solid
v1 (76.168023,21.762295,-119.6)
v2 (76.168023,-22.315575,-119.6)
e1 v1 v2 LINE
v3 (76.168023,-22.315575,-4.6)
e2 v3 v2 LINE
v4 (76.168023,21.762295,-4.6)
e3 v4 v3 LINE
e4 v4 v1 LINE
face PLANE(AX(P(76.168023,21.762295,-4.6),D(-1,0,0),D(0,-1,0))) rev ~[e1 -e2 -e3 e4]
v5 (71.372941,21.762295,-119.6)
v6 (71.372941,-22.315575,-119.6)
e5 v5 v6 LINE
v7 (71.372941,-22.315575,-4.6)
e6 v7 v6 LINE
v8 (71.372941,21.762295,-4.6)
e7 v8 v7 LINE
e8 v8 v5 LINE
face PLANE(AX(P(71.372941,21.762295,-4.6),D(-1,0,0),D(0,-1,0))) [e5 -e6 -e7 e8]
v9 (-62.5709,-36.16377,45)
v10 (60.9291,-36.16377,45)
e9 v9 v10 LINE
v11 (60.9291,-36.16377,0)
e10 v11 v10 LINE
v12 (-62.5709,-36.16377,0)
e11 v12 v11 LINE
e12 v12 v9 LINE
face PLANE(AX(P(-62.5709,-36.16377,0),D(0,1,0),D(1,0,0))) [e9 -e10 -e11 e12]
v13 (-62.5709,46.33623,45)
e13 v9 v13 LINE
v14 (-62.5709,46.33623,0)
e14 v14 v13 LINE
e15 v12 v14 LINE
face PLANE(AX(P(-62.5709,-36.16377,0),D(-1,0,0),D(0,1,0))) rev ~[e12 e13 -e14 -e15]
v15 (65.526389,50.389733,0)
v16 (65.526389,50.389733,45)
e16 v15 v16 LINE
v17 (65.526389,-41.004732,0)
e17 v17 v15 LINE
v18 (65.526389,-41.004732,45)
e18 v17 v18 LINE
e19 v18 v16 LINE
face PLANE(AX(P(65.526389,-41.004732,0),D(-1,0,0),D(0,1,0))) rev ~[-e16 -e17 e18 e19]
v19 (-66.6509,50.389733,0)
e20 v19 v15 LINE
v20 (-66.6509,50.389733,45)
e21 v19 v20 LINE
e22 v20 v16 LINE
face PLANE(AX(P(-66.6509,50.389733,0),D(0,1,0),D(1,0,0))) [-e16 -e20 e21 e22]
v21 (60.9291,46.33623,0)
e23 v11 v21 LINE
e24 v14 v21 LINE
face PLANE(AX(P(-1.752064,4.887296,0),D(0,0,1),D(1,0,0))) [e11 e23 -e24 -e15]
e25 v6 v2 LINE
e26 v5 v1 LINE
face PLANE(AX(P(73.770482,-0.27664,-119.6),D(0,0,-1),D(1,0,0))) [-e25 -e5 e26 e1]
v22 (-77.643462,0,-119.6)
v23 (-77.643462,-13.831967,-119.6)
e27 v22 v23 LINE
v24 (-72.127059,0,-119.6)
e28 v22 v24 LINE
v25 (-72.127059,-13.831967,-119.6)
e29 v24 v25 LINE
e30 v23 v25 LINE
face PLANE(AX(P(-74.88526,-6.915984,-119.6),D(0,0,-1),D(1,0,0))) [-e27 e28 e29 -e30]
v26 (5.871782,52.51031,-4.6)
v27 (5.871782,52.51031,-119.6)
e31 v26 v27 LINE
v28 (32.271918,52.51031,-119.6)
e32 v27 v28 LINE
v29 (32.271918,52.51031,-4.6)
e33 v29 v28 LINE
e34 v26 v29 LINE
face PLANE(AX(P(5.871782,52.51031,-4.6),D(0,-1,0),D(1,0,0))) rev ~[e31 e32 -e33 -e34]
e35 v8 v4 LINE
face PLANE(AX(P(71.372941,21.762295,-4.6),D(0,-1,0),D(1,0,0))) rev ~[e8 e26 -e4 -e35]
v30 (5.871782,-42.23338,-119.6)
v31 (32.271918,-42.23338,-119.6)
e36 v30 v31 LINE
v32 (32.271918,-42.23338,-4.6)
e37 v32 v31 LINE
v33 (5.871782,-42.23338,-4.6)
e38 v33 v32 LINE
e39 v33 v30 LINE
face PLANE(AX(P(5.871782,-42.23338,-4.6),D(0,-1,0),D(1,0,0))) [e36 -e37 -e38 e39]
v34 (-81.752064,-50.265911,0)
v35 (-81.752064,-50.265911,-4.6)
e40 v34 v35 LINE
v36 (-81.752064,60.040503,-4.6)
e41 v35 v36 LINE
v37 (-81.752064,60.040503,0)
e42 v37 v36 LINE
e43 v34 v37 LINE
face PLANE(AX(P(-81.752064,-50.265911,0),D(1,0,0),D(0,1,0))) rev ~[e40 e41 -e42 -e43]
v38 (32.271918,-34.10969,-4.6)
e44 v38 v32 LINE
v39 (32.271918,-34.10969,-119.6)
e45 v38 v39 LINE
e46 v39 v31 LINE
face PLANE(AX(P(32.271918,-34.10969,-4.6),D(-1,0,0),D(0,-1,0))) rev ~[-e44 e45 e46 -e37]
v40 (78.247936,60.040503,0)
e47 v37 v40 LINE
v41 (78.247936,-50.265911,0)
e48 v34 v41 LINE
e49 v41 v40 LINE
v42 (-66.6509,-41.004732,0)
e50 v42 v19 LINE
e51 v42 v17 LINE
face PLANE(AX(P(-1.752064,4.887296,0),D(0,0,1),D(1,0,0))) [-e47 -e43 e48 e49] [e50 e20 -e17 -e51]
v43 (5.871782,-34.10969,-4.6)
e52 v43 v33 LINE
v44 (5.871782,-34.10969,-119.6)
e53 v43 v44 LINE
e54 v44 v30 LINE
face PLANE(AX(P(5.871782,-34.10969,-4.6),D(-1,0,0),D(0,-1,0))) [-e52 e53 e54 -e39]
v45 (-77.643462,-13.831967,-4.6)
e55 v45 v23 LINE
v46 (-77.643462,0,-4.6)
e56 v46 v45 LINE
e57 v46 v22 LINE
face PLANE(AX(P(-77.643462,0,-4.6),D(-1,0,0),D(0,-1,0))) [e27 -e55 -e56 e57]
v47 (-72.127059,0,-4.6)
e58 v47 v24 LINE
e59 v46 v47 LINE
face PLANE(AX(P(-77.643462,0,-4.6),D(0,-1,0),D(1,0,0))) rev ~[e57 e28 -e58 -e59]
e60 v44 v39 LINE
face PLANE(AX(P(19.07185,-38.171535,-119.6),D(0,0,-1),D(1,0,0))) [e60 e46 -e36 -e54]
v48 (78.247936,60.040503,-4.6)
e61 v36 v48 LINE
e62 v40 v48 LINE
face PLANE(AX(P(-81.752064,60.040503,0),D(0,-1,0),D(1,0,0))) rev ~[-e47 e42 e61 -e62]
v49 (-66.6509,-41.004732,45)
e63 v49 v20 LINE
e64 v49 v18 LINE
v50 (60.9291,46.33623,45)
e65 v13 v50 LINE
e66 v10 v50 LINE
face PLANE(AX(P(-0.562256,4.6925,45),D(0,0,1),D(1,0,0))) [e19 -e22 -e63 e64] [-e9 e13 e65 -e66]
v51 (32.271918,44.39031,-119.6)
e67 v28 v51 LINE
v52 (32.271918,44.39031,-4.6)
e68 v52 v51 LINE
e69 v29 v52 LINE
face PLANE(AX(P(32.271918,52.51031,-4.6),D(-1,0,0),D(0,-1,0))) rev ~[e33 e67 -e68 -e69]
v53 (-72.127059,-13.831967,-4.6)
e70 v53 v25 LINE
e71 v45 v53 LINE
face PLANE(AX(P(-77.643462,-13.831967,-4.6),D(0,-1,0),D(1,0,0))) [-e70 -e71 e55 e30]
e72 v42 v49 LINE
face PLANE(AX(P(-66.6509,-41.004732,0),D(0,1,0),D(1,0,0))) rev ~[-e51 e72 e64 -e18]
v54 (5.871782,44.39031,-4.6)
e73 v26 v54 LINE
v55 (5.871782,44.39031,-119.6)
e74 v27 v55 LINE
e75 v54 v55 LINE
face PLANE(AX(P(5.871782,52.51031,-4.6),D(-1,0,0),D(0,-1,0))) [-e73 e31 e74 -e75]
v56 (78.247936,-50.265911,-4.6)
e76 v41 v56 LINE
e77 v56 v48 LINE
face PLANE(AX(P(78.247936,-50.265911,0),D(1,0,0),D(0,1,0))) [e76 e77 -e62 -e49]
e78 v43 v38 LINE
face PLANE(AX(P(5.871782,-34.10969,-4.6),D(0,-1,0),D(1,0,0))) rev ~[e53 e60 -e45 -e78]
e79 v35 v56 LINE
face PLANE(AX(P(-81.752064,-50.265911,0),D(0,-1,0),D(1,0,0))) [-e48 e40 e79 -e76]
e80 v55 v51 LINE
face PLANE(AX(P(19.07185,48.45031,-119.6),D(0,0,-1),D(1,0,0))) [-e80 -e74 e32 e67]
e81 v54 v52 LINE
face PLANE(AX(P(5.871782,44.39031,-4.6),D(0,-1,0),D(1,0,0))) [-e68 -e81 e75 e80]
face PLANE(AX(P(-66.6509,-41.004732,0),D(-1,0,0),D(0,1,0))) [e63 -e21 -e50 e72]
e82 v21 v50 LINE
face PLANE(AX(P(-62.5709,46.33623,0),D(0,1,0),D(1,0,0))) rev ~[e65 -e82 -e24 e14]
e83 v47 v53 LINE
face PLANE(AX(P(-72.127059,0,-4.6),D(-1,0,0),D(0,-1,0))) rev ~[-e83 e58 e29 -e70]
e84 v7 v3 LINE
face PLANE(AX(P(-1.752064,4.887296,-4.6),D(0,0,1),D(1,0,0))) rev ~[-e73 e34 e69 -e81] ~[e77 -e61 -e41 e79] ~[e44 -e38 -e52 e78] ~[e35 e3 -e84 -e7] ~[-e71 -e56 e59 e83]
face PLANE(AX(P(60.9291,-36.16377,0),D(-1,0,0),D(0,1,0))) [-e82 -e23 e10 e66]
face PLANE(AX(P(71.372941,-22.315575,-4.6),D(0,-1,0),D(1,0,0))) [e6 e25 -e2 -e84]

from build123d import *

# Parameters (mm, degrees)
F0_W     = 132.1772886384
F0_H     = 91.3944654167
F0_W_2   = 123.5
F0_H_2   = 82.5
F1_DEPTH = 45
F2_W     = 160
F2_H     = 110.3064134685
F3_DEPTH = 4.6
F4_W     = 26.40013583
F4_H     = 8.1236897111
F4_H_2   = 8.12
F5_DEPTH = 115
F6_W     = 4.7950819135
F6_H     = 44.0778695047
F7_DEPTH = 115
F8_W     = 5.5164026618
F8_H     = 13.8319674879
F9_DEPTH = 115


# Not quite as in the source:
# - the program builds the solid bodies; features that only make, move or delete a surface that nothing else refers to are left out


with BuildPart() as f1:
    # F0 (on Top) → F1 (new body)
    with BuildSketch(Plane.XY):
        with Locations((-0.5622557336, 4.6925004572)):
            Rectangle(F0_W, F0_H)
        with Locations((-0.8209000528, 5.0862303376)):
            Rectangle(F0_W_2, F0_H_2, mode=Mode.SUBTRACT)
    extrude(amount=F1_DEPTH)

    # F2 (on Top) → F3 (join)
    with BuildSketch(Plane.XY):
        with Locations((-1.752063632, 4.8872958869)):
            Rectangle(F2_W, F2_H)
    extrude(amount=-F3_DEPTH)

    # F4 (on face) → F5 (join)
    with BuildSketch(Plane(origin=(0, 0, -4.6), x_dir=(1, 0, 0), z_dir=(0, 0, -1))):
        with Locations((19.0718499944, 38.1715348911)):
            Rectangle(F4_W, F4_H)
        with Locations((19.0718499944, -48.4503099644)):
            Rectangle(F4_W, F4_H_2)
    extrude(amount=F5_DEPTH)

    # F6 (on face) + F4 (on face) → F7 (join)
    with BuildSketch(Plane(origin=(0, 0, -4.6), x_dir=(1, 0, 0), z_dir=(0, 0, -1))):
        with Locations((73.7704820931, 0.2766400576)):
            Rectangle(F6_W, F6_H)
    with BuildSketch(Plane(origin=(0, 0, -4.6), x_dir=(1, 0, 0), z_dir=(0, 0, -1))):
        with Locations((19.0718499944, 38.1715348911)):
            Rectangle(F4_W, F4_H)
        with Locations((19.0718499944, -48.4503099644)):
            Rectangle(F4_W, F4_H_2)
    extrude(amount=F7_DEPTH)

    # F8 (on face) → F9 (join)
    with BuildSketch(Plane(origin=(0, 0, -4.6), x_dir=(1, 0, 0), z_dir=(0, 0, -1))):
        with Locations((-74.8852601945, 6.915983744)):
            Rectangle(F8_W, F8_H)
    extrude(amount=F9_DEPTH)


solid = f1.part
